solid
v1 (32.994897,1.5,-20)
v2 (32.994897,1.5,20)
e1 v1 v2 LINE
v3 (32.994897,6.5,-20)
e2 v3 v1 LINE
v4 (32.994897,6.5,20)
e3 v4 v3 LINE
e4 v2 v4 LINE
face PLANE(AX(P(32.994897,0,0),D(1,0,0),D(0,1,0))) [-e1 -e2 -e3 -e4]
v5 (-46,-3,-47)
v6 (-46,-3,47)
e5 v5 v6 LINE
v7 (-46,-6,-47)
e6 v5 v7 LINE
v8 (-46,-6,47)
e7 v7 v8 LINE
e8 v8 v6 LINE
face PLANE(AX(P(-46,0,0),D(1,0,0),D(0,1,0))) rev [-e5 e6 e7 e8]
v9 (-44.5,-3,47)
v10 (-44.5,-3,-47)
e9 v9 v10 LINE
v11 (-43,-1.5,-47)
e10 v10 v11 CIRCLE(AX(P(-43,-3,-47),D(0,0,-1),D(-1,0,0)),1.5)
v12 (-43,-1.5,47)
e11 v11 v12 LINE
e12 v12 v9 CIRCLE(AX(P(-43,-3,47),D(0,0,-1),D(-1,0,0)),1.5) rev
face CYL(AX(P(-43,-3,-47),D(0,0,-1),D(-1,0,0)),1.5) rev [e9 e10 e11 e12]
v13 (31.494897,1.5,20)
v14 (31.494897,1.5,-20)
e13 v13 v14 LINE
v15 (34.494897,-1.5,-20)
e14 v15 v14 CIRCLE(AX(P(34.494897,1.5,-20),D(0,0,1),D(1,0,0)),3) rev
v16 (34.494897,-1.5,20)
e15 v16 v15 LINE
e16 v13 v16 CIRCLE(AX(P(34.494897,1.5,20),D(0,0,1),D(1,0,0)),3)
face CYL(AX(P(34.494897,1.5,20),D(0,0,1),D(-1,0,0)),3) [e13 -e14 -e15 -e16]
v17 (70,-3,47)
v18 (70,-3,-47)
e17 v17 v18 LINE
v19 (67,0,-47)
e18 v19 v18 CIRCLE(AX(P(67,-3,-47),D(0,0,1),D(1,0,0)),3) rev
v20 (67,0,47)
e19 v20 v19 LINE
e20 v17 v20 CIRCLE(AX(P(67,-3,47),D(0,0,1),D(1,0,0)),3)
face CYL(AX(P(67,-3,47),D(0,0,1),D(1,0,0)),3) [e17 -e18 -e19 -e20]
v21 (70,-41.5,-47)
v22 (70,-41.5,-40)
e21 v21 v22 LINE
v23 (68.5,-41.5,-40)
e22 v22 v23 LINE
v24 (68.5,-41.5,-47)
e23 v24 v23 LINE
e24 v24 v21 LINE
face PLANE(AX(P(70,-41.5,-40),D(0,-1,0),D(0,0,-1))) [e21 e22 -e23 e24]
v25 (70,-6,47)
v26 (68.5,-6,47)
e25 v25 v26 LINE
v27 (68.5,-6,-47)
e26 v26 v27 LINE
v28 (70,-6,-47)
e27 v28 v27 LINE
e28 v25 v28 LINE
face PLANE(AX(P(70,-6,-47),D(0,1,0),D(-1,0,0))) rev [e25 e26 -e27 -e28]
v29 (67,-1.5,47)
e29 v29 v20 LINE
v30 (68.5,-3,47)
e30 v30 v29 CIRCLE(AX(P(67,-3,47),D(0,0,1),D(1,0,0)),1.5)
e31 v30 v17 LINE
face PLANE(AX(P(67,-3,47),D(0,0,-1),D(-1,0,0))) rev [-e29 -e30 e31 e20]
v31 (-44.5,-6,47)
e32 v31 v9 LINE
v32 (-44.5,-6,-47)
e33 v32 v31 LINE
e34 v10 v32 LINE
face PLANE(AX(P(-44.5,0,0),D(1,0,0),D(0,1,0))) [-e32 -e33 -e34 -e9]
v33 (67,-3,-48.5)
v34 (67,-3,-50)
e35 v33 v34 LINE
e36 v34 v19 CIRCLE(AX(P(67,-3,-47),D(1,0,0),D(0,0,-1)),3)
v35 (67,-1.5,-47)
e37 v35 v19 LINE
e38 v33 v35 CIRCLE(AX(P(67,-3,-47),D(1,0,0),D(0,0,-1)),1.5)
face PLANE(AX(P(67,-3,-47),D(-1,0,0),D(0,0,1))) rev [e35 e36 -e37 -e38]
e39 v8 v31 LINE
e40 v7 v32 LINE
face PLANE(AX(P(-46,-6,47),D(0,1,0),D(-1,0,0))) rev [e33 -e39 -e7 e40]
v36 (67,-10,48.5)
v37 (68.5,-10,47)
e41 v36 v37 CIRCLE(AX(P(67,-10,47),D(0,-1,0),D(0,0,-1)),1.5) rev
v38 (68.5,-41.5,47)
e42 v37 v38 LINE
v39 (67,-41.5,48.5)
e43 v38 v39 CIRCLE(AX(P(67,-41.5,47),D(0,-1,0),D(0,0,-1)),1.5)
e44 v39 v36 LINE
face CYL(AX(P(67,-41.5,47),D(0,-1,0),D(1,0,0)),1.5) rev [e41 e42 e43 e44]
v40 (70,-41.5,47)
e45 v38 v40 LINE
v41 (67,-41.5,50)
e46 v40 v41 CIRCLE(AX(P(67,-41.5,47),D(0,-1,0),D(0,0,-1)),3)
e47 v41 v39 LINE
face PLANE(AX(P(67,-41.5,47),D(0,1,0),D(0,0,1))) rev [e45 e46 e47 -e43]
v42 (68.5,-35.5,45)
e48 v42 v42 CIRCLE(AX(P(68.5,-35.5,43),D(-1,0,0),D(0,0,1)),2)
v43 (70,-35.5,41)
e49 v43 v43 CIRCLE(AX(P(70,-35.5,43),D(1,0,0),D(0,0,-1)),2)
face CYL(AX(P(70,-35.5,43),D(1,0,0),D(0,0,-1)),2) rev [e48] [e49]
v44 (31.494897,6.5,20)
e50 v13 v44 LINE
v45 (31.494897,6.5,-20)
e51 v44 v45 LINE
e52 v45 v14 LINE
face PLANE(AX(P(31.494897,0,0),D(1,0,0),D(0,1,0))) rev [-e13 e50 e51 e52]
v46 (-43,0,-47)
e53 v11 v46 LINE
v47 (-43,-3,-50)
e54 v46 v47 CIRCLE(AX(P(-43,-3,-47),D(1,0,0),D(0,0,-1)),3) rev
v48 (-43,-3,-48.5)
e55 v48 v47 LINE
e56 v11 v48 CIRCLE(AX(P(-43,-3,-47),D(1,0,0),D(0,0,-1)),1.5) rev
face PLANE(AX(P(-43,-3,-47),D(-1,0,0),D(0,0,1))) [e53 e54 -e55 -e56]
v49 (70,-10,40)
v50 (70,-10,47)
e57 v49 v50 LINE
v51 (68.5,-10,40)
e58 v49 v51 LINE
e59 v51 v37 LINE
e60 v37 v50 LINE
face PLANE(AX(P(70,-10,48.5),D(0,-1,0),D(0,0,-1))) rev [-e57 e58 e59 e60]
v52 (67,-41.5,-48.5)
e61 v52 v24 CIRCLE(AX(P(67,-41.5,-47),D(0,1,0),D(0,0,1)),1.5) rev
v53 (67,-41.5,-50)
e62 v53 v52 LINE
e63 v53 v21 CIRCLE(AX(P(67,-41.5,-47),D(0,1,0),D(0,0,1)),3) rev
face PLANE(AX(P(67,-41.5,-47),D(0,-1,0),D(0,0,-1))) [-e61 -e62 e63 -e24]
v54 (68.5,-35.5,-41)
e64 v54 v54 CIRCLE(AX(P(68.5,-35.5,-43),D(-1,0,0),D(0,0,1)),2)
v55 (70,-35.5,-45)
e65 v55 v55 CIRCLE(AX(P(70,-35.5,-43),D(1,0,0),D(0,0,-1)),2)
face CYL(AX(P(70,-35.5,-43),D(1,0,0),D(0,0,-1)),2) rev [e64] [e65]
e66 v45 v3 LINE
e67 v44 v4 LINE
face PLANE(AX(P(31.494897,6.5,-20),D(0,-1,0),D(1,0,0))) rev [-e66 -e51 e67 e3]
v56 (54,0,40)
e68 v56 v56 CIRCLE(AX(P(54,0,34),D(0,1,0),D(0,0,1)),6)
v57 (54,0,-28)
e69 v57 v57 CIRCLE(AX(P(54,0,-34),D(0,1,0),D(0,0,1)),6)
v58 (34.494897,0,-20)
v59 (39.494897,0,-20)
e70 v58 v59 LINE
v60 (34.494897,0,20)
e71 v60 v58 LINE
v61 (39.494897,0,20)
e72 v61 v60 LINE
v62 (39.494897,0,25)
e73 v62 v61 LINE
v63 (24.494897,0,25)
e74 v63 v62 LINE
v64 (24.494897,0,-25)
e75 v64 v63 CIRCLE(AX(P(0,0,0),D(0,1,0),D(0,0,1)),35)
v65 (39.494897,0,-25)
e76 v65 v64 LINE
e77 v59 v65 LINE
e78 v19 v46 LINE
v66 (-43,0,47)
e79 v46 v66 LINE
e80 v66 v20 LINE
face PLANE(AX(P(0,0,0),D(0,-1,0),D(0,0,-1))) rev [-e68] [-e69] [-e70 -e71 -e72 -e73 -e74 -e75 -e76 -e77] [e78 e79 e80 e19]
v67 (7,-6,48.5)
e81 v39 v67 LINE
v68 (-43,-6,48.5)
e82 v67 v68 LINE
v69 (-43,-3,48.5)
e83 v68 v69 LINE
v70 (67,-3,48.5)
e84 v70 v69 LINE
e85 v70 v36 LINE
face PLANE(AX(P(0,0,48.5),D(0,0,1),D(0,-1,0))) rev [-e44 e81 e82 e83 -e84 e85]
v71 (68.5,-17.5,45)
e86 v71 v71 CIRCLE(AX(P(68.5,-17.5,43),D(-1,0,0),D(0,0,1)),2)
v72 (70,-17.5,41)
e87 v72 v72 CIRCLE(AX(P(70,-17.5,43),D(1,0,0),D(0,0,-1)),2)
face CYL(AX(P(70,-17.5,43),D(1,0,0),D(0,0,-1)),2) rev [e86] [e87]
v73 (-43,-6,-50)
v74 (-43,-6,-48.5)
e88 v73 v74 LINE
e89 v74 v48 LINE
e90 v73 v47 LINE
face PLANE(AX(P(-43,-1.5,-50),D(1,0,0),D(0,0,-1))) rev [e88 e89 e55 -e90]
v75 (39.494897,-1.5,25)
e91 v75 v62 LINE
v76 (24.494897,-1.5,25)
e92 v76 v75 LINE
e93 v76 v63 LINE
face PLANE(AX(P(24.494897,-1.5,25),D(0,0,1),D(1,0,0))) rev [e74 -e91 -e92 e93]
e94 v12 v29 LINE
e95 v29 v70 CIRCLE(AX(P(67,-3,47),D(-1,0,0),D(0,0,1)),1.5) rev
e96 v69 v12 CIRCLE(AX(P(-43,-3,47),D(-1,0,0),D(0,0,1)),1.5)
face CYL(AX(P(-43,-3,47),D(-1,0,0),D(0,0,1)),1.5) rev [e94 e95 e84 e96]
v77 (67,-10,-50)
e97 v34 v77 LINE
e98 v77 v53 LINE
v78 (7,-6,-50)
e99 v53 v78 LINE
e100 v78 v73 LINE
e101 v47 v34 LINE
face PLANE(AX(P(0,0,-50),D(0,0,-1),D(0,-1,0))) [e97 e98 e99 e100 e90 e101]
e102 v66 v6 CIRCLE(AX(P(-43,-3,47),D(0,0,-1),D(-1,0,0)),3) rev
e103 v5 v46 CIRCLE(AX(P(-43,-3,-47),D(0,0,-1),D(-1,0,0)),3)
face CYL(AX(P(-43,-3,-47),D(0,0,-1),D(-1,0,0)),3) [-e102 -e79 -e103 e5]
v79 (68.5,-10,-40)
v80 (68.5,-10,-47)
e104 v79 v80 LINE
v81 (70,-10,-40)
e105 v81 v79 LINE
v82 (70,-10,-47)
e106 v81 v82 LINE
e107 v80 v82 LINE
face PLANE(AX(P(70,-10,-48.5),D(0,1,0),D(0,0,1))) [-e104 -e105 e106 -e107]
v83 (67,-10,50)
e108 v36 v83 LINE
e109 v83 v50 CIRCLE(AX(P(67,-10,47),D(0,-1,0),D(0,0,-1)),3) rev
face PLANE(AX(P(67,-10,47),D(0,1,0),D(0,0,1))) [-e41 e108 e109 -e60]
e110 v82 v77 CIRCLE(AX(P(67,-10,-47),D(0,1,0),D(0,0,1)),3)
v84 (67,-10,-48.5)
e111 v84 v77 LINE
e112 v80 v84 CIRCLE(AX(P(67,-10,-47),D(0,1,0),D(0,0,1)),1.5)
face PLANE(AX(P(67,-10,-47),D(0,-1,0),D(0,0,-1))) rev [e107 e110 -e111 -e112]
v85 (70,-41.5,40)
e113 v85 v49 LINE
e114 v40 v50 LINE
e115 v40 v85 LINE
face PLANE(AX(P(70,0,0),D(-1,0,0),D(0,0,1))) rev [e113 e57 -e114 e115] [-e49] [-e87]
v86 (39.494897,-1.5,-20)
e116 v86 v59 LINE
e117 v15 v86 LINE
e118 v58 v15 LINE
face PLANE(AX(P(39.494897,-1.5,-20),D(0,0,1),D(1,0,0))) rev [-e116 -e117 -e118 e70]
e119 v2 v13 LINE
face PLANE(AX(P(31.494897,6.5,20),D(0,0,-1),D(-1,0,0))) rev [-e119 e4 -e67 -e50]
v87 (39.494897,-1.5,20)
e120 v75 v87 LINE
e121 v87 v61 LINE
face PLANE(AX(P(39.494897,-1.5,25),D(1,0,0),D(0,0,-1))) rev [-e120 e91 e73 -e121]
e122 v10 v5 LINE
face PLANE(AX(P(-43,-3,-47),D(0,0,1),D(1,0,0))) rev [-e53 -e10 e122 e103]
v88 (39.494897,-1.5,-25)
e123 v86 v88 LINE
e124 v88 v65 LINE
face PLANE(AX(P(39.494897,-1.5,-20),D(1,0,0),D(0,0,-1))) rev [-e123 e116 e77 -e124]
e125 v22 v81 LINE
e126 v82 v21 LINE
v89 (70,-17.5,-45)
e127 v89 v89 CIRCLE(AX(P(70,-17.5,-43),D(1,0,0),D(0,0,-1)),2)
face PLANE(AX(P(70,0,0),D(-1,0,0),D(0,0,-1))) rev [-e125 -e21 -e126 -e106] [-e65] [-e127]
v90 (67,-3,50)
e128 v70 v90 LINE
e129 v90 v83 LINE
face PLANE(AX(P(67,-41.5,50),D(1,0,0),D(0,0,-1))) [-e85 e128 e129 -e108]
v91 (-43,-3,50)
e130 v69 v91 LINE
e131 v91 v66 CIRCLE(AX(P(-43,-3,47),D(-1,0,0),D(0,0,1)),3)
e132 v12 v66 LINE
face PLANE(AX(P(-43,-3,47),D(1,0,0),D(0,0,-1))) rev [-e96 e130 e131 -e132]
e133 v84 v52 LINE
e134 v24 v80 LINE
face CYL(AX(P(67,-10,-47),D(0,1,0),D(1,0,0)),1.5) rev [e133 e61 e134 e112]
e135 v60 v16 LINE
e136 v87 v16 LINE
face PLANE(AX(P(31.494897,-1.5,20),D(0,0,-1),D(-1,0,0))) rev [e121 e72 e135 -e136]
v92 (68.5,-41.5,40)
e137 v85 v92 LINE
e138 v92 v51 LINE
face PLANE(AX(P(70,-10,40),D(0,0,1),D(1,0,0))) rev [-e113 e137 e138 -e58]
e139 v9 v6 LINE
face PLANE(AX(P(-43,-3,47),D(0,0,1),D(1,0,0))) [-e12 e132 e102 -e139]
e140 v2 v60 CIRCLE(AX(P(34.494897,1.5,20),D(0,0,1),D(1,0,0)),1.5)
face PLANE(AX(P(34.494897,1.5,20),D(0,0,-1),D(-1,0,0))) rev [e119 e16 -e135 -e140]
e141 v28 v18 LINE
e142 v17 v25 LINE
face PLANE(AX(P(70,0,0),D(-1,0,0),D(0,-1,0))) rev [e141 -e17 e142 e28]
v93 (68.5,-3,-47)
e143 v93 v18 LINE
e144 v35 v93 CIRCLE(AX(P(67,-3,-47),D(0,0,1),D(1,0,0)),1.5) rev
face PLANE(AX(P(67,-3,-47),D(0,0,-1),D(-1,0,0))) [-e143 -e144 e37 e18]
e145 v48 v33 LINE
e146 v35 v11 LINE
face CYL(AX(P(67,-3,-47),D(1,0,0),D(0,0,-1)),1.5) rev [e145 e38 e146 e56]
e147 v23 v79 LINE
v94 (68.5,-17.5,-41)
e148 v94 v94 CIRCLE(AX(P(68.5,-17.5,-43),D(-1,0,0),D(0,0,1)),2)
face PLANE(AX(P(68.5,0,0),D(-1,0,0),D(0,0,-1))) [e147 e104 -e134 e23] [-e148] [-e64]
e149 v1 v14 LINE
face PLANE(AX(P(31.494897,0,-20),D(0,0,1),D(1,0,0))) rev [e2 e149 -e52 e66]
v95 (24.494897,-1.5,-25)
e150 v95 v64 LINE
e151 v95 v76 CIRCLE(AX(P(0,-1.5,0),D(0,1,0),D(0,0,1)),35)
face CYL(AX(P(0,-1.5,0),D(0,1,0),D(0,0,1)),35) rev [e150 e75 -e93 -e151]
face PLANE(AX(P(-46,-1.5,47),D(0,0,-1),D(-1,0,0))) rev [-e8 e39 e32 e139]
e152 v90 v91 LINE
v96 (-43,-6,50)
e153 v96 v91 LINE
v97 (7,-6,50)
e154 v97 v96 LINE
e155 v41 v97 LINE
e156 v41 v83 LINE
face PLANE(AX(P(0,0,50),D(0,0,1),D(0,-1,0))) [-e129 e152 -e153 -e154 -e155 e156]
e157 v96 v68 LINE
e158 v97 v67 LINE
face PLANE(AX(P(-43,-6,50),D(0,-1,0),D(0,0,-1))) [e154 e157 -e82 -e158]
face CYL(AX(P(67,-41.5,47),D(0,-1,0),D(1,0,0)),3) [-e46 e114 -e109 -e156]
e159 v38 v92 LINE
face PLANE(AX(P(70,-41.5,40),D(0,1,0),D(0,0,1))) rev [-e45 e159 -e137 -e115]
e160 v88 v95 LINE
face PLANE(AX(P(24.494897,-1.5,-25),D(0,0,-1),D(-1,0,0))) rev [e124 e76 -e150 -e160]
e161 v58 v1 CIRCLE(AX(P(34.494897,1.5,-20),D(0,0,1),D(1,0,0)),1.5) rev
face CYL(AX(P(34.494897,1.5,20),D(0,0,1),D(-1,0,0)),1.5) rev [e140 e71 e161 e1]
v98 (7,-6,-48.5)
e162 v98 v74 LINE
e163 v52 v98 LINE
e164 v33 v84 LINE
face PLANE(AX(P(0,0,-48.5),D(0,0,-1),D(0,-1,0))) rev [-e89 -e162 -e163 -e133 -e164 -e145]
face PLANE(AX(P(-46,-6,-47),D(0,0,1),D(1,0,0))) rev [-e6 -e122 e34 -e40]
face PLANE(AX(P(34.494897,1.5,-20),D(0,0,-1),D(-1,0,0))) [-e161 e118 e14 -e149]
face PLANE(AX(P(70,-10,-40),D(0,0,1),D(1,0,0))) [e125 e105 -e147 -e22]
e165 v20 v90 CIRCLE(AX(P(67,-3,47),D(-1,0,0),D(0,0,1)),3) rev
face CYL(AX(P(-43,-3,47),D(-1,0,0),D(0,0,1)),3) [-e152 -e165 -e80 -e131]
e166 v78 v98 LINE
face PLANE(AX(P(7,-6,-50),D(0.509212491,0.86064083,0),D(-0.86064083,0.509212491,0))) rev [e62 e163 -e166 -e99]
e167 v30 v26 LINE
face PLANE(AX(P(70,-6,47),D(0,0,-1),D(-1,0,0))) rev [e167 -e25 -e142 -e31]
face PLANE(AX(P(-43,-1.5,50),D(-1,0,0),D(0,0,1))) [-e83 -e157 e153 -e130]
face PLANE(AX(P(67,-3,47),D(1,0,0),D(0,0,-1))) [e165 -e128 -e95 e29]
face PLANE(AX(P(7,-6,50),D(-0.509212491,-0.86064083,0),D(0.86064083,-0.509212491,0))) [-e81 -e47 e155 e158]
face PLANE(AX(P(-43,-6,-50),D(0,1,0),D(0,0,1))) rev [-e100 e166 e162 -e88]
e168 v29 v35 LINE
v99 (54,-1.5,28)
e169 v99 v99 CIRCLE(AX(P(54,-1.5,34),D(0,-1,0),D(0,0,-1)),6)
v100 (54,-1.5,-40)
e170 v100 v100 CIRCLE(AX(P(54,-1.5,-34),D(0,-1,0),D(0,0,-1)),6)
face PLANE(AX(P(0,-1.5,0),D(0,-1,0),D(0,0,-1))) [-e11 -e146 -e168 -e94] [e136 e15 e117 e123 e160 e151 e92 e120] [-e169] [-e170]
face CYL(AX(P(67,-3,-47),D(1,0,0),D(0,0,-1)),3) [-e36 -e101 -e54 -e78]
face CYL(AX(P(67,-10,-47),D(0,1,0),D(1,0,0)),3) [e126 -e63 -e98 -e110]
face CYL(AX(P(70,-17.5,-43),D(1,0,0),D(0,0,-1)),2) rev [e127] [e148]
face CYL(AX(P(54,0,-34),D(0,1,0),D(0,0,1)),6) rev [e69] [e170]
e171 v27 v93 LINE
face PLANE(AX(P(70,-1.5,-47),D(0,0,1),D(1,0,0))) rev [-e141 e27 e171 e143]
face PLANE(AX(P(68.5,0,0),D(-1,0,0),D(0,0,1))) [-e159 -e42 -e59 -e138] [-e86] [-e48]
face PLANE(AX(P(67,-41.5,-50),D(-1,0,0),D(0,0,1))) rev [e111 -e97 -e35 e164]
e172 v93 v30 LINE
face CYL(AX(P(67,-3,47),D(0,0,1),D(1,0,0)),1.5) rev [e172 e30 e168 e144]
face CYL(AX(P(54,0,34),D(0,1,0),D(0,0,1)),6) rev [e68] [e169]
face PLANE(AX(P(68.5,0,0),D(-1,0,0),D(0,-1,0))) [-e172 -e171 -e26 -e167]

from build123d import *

# Parameters (mm, degrees)
SKETCH1_W                    = 110
SKETCH1_H                    = 100
BASE_FLANGE1_DEPTH           = 1.5
EDGE_FLANGE1_STRIP_W         = 9
EDGE_FLANGE1_STRIP_H         = 1.5
EDGE_FLANGE1_STRIP_CUT_DEPTH = 110
EDGE_FLANGE1_DEPTH           = 110
EDGE_FLANGE1_FLAT_DEPTH      = 1.5
EDGE_FLANGE2_DEPTH           = 31.5
F_4_0_4_DIAMETER_HOLE1_D     = 4
EDGE_FLANGE3_DEPTH           = 94
EDGE_FLANGE3_BEND_DEPTH      = 94
F_12_0_12_DIAMETER_HOLE1_D   = 12
EDGE_FLANGE4_STRIP_W         = 9
EDGE_FLANGE4_STRIP_H         = 1.5
EDGE_FLANGE4_STRIP_CUT_DEPTH = 40
EDGE_FLANGE4_DEPTH           = 40


# Sheet-metal steps are written as plain solids
with BuildPart() as part:
    # Sketch1 → Base-Flange1 (new body)
    with BuildSketch(Plane(origin=(0, 0, 0), x_dir=(1, 0, 0), z_dir=(0, 1, 0))):
        with Locations((12, 0)):
            Rectangle(SKETCH1_W, SKETCH1_H)
        with BuildLine():
            Line((24.494897428, -25), (39.494897428, -25))
            Line((39.494897428, -25), (39.494897428, -20))
            Line((39.494897428, -20), (31.494897428, -20))
            Line((31.494897428, -20), (31.494897428, 20))
            Line((31.494897428, 20), (39.494897428, 20))
            Line((39.494897428, 20), (39.494897428, 25))
            Line((39.494897428, 25), (24.494897428, 25))
            ThreePointArc((24.494897428, 25), (-35, 0), (24.494897428, -25))
        make_face(mode=Mode.SUBTRACT)
    extrude(amount=-BASE_FLANGE1_DEPTH)

    # Edge-Flange1 strip (across the edge) → Edge-Flange1 strip cut (cut)
    with BuildSketch(Plane(origin=(67, -1.5, 50), x_dir=(0, 0, -1), z_dir=(-1, 0, 0))):
        with Locations((-1.5, -0.75)):
            Rectangle(EDGE_FLANGE1_STRIP_W, EDGE_FLANGE1_STRIP_H)
    edge_flange1_strip_cut = extrude(amount=EDGE_FLANGE1_STRIP_CUT_DEPTH, mode=Mode.SUBTRACT)

    # Edge-Flange1 bend section (across the edge) → Edge-Flange1 (add)
    with BuildSketch(Plane(origin=(67, -1.5, 50), x_dir=(0, 0, -1), z_dir=(-1, 0, 0))):
        with BuildLine():
            Line((0, 1.5), (1.5, 1.5))
            ThreePointArc((1.5, 1.5), (1.939339828, 0.439339828), (3, 0))
            Line((3, 0), (3, -1.5))
            ThreePointArc((3, -1.5), (0.878679656, -0.621320344), (0, 1.5))
        make_face()
    edge_flange1 = extrude(amount=EDGE_FLANGE1_DEPTH)

    # Edge-Flange1 profile (on flange) → Edge-Flange1 flat (add)
    with BuildSketch(Plane(origin=(0, -1.5, 50), x_dir=(1, 0, 0), z_dir=(0, 0, -1))):
        Polygon((-43, 1.5), (67, 1.5), (67, 40), (7, 4.5), (-43, 4.5), align=None)
    edge_flange1_flat = extrude(amount=EDGE_FLANGE1_FLAT_DEPTH)

    # Edge-Flange2 section (across the edge) → Edge-Flange2 (add)
    with BuildSketch(Plane(origin=(68.5, -10, 48.5), x_dir=(-1, 0, 0), z_dir=(0, -1, 0))):
        with BuildLine():
            Line((-1.5, 1.5), (-1.5, 8.5))
            Line((-1.5, 8.5), (0, 8.5))
            Line((0, 8.5), (0, 1.5))
            ThreePointArc((0, 1.5), (0.439339828, 0.439339828), (1.5, 0))
            Line((1.5, 0), (1.5, -1.5))
            ThreePointArc((1.5, -1.5), (-0.621320344, -0.621320344), (-1.5, 1.5))
        make_face()
    edge_flange2 = extrude(amount=EDGE_FLANGE2_DEPTH)

    # Ø4.0 (4) Diameter Hole1 (through all)
    with Locations(Plane(origin=(70, 0, 0), x_dir=(0, 0, -1), z_dir=(1, 0, 0))):
        with Locations((-43, -17.5), (-43, -35.5)):
            f_4_0_4_diameter_hole1 = Hole(F_4_0_4_DIAMETER_HOLE1_D / 2)

    # Mirror1: Edge-Flange1 strip cut, Edge-Flange1, Edge-Flange1 flat, Edge-Flange2, Ø4.0 (4) Diameter Hole1 across plane
    add(edge_flange1_strip_cut.mirror(Plane.XY), mode=Mode.SUBTRACT)
    add(edge_flange1.mirror(Plane.XY))
    add(edge_flange1_flat.mirror(Plane.XY))
    add(edge_flange2.mirror(Plane.XY))
    add(f_4_0_4_diameter_hole1.mirror(Plane.XY), mode=Mode.SUBTRACT)

    # Edge-Flange3 section (across the edge) → Edge-Flange3 (add)
    with BuildSketch(Plane(origin=(68.5, -1.5, -47), x_dir=(-1, 0, 0), z_dir=(0, 0, 1))):
        with BuildLine():
            Line((-1.5, 1.5), (-1.5, 4.5))
            Line((-1.5, 4.5), (0, 4.5))
            Line((0, 4.5), (0, 1.5))
            ThreePointArc((0, 1.5), (0.439339828, 0.439339828), (1.5, 0))
            Line((1.5, 0), (1.5, -1.5))
            ThreePointArc((1.5, -1.5), (-0.621320344, -0.621320344), (-1.5, 1.5))
        make_face()
    extrude(amount=EDGE_FLANGE3_DEPTH)

    # Edge-Flange3 section 2 (across the edge) → Edge-Flange3 bend (add)
    with BuildSketch(Plane(origin=(-44.5, -1.5, 47), x_dir=(1, 0, 0), z_dir=(0, 0, -1))):
        with BuildLine():
            Line((-1.5, 1.5), (-1.5, 4.5))
            Line((-1.5, 4.5), (0, 4.5))
            Line((0, 4.5), (0, 1.5))
            ThreePointArc((0, 1.5), (0.439339828, 0.439339828), (1.5, 0))
            Line((1.5, 0), (1.5, -1.5))
            ThreePointArc((1.5, -1.5), (-0.621320344, -0.621320344), (-1.5, 1.5))
        make_face()
    extrude(amount=EDGE_FLANGE3_BEND_DEPTH)

    # Ø12.0 (12) Diameter Hole1 (through all)
    with Locations(Plane(origin=(0, 0, 0), x_dir=(1, 0, 0), z_dir=(0, 1, 0))):
        with Locations((54, 34), (54, -34)):
            Hole(F_12_0_12_DIAMETER_HOLE1_D / 2)

    # Edge-Flange4 strip (across the edge) → Edge-Flange4 strip cut (cut)
    with BuildSketch(Plane(origin=(31.494897428, 0, -20), x_dir=(1, 0, 0), z_dir=(0, 0, 1))):
        with Locations((-1.5, -0.75)):
            Rectangle(EDGE_FLANGE4_STRIP_W, EDGE_FLANGE4_STRIP_H)
    extrude(amount=EDGE_FLANGE4_STRIP_CUT_DEPTH, mode=Mode.SUBTRACT)

    # Edge-Flange4 section (across the edge) → Edge-Flange4 (add)
    with BuildSketch(Plane(origin=(31.494897428, 0, -20), x_dir=(1, 0, 0), z_dir=(0, 0, 1))):
        with BuildLine():
            Line((0, 1.5), (0, 6.5))
            Line((0, 6.5), (1.5, 6.5))
            Line((1.5, 6.5), (1.5, 1.5))
            ThreePointArc((1.5, 1.5), (1.939339828, 0.439339828), (3, 0))
            Line((3, 0), (3, -1.5))
            ThreePointArc((3, -1.5), (0.878679656, -0.621320344), (0, 1.5))
        make_face()
    extrude(amount=EDGE_FLANGE4_DEPTH)


solid = part.part
